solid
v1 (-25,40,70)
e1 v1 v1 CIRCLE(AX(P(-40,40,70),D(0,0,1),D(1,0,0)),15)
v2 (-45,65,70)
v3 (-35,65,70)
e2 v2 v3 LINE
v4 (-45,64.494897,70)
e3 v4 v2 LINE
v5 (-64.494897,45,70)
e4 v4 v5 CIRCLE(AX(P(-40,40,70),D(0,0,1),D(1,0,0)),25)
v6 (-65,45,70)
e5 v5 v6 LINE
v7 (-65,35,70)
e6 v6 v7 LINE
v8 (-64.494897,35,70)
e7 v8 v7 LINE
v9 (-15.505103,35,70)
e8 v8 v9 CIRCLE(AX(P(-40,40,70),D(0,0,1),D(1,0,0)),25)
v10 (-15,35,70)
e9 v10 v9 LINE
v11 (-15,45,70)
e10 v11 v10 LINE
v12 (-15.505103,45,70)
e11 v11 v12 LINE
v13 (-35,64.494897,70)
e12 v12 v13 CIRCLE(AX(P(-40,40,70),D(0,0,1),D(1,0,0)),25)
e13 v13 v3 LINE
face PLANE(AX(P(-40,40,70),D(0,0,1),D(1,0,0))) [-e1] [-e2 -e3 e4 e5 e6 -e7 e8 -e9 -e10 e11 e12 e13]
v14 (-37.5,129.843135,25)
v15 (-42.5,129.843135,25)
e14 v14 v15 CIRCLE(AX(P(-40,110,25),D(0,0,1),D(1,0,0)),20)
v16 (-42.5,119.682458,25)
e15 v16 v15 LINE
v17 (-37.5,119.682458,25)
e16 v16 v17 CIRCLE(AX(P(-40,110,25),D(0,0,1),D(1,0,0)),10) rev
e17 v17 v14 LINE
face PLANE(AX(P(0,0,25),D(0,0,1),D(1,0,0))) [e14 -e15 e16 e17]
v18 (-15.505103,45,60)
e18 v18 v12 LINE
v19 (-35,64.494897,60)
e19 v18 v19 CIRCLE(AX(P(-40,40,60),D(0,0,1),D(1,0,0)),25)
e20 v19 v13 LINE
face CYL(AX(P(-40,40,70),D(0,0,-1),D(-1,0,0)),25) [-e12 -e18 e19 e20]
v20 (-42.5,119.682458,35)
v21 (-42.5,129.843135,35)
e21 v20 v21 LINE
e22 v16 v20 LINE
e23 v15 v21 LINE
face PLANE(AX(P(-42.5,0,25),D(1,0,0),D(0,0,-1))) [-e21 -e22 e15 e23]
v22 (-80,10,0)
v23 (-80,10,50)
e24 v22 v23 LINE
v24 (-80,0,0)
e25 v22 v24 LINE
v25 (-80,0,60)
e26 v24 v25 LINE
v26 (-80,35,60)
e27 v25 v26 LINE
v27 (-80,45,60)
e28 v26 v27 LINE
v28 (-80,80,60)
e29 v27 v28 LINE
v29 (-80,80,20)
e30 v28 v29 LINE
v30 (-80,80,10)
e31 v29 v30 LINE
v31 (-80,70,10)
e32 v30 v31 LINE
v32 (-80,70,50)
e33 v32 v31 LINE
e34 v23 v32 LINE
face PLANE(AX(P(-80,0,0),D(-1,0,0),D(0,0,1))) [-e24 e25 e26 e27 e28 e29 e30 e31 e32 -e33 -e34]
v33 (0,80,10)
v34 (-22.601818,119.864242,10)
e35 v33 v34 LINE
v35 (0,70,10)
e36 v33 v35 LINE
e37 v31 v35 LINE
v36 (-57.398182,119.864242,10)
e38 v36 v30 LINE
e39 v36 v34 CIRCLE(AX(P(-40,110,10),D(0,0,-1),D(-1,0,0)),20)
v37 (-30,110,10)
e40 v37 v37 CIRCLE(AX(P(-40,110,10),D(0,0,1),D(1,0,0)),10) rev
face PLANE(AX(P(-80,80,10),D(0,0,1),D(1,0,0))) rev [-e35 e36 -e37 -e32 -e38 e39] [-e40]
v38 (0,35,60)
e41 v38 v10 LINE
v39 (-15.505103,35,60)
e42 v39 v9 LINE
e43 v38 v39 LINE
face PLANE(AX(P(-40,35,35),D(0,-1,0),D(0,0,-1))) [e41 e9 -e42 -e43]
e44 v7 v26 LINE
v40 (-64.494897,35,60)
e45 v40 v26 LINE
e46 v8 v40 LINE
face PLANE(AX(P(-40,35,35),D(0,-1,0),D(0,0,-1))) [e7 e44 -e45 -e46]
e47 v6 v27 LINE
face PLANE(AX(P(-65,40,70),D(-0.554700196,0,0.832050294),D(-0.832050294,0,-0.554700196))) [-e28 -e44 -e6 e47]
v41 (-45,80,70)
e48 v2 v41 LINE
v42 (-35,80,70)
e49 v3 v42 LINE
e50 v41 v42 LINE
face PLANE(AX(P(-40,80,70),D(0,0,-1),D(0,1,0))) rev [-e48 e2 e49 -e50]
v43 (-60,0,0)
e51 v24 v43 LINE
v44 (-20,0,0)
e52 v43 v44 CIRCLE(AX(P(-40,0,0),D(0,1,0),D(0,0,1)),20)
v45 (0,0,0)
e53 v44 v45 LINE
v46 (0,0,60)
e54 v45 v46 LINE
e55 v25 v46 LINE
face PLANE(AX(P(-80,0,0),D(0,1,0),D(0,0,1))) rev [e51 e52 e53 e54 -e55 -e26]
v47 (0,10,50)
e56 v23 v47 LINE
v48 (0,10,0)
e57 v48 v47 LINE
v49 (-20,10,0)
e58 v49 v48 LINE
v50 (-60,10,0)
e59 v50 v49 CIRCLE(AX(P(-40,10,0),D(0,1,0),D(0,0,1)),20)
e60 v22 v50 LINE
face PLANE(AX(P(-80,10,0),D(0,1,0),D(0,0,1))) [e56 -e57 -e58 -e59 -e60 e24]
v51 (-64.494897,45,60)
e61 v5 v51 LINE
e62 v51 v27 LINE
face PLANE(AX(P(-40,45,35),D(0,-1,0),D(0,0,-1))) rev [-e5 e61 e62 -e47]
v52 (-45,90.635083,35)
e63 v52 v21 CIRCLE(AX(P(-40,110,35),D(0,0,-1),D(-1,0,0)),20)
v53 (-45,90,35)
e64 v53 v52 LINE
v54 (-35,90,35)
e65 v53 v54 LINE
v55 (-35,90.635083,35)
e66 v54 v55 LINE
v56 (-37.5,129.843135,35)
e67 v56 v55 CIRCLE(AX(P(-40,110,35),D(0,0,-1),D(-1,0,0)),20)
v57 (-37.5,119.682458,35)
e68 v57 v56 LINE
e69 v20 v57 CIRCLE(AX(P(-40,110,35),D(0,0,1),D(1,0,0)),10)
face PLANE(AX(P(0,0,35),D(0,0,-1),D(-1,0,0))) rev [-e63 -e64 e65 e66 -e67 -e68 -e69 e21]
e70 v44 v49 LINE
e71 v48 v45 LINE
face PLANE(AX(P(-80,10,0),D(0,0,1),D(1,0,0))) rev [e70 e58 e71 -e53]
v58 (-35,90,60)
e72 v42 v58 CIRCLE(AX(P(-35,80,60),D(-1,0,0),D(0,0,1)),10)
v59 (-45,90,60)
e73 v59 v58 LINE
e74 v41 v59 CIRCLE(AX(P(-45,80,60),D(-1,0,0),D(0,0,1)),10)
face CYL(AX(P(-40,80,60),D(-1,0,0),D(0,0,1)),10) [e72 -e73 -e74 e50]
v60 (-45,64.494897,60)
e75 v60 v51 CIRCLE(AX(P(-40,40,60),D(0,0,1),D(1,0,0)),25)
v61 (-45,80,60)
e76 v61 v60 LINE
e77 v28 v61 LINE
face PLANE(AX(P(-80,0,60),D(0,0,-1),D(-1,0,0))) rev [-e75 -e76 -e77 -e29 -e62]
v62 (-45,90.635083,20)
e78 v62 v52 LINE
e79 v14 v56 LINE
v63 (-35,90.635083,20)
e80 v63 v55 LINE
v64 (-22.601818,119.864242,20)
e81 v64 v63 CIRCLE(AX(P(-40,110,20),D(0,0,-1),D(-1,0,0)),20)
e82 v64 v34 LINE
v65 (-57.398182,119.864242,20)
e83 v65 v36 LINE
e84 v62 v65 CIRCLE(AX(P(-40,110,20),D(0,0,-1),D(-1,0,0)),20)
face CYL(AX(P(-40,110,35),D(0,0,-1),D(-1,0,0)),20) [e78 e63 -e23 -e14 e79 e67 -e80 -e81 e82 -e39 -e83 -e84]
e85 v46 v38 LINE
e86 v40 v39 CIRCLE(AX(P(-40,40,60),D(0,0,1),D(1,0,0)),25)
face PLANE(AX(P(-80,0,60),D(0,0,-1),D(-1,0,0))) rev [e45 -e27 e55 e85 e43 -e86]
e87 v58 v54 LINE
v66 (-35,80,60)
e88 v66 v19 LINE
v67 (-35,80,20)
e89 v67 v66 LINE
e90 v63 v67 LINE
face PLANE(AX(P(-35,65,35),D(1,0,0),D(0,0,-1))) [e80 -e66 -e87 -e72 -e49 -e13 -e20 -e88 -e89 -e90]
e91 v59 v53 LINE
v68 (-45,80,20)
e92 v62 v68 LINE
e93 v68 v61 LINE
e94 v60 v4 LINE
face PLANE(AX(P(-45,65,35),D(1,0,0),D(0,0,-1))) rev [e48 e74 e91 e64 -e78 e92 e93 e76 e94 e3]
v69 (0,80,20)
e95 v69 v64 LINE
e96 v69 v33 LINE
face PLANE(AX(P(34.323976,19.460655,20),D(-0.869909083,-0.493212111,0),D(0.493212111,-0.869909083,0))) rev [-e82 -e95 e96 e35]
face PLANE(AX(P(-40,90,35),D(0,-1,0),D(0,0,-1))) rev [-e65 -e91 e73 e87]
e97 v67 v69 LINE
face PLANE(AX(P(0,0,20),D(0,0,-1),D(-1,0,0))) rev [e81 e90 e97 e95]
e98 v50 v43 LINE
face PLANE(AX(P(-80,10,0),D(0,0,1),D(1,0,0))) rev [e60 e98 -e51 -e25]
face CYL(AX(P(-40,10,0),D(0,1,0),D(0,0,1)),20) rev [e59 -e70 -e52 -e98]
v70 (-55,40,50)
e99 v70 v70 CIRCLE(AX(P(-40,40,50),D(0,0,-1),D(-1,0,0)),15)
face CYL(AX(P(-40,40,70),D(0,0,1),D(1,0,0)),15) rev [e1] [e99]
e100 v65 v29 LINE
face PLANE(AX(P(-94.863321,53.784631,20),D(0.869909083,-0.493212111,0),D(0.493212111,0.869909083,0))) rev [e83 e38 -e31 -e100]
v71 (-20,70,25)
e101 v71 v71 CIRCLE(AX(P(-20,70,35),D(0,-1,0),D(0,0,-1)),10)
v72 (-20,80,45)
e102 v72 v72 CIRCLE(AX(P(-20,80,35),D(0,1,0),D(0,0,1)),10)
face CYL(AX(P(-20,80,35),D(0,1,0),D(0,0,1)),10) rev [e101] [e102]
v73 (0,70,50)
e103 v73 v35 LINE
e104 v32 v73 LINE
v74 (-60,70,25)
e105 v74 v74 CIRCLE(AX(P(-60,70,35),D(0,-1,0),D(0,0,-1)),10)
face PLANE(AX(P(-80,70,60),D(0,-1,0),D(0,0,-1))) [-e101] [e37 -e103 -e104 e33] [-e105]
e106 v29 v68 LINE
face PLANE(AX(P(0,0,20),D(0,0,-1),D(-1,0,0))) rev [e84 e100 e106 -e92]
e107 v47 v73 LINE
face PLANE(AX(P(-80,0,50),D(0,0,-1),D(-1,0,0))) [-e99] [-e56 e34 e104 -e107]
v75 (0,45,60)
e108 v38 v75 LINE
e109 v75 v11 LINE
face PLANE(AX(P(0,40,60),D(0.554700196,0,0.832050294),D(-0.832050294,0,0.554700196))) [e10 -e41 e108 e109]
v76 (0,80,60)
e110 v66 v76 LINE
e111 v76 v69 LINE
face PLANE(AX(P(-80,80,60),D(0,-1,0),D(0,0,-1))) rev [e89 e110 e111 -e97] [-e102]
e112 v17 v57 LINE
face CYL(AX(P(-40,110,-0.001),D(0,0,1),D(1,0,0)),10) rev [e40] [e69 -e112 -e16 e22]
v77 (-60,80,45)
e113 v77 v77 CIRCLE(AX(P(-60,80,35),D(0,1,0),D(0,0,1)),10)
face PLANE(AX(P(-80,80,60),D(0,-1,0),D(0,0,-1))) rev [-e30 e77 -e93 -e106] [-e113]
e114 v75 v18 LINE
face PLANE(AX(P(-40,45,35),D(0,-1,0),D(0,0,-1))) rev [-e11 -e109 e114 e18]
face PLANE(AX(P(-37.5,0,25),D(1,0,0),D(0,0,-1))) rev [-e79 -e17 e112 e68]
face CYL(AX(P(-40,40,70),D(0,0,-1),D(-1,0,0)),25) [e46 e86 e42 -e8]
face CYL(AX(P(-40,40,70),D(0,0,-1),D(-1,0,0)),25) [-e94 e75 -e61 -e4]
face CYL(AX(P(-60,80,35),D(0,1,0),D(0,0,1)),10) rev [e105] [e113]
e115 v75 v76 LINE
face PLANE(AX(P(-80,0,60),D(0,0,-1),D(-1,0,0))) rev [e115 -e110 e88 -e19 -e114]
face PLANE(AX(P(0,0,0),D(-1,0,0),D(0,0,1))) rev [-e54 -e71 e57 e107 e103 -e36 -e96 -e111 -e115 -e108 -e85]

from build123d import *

# Parameters (mm, degrees)
EXTRUDE_THIN1_DEPTH = 80
BOSS_EXTRUDE1_DEPTH = 10
SKETCH2_3_R         = 20
BOSS_EXTRUDE2_DEPTH = 25
CUT_EXTRUDE1_REACH  = 158.605
SKETCH3_3_R         = 10
SKETCH3_3_W         = 5
SKETCH3_3_H         = 10.317541634
CUT_EXTRUDE2_DEPTH  = 10
HOLE1_D             = 40
HOLE1_DEPTH         = 10
SKETCH6_R           = 25
BOSS_EXTRUDE3_DEPTH = 10
RIB17_START         = -5
RIB17_DEPTH         = 10
RIB18_START         = -5
RIB18_DEPTH         = 10
RIB26_START         = -5
RIB26_DEPTH         = 10
HOLE2_D             = 30
HOLE3_D             = 20
HOLE3_DEPTH         = 10


with BuildPart() as part:
    # Sketch1 → Extrude-Thin1 (new body)
    with BuildSketch(Plane(origin=(0, 0, 0), x_dir=(0, 0, -1), z_dir=(1, 0, 0))):
        Polygon((0, 0), (-60, 0), (-60, 80), (-10, 80), (-10, 70), (-50, 70), (-50, 10), (0, 10), align=None)
    extrude(amount=-EXTRUDE_THIN1_DEPTH)

    # Sketch2 → Boss-Extrude1 (add)
    with BuildSketch(Plane(origin=(0, 0, 10), x_dir=(-1, 0, 0), z_dir=(0, 0, -1))):
        with BuildLine():
            Line((40, 80), (80, 80))
            Line((80, 80), (57.398181668, 119.864242224))
            ThreePointArc((57.398181668, 119.864242224), (59.338609482, 115.100802223), (60, 110))
            ThreePointArc((60, 110), (54.142135624, 95.857864376), (40, 90))
            Line((40, 90), (40, 80))
        make_face()
        with BuildLine():
            Line((0, 80), (40, 80))
            Line((40, 80), (40, 90))
            ThreePointArc((40, 90), (22.718726255, 99.932349938), (22.601818332, 119.864242224))
            Line((22.601818332, 119.864242224), (0, 80))
        make_face()
    extrude(amount=-BOSS_EXTRUDE1_DEPTH)

    # Sketch2<3> → Boss-Extrude2 (add)
    with BuildSketch(Plane(origin=(0, 0, 10), x_dir=(-1, 0, 0), z_dir=(0, 0, -1))):
        with Locations((40, 110)):
            Circle(SKETCH2_3_R)
    extrude(amount=-BOSS_EXTRUDE2_DEPTH)

    # Sketch3 → Cut-Extrude1 (cut, up to next)
    with BuildSketch(Plane.XY.offset(35), mode=Mode.PRIVATE) as cut_extrude1_sk1:
        with BuildLine():
            ThreePointArc((-37.5, 119.682458366), (-40, 120), (-42.5, 119.682458366))
            Line((-42.5, 119.682458366), (-37.5, 119.682458366))
        make_face()
    cut_extrude1_tool1 = extrude(cut_extrude1_sk1.sketch, amount=-CUT_EXTRUDE1_REACH, mode=Mode.PRIVATE) & part.part
    # Sketch3 → Cut-Extrude1 (cut, up to next)
    with BuildSketch(Plane.XY.offset(35), mode=Mode.PRIVATE) as cut_extrude1_sk2:
        with BuildLine():
            Line((-37.5, 119.682458366), (-42.5, 119.682458366))
            ThreePointArc((-42.5, 119.682458366), (-46.123724357, 102.09430585), (-30, 110))
            ThreePointArc((-30, 110), (-32.09430585, 116.123724357), (-37.5, 119.682458366))
        make_face()
    cut_extrude1_tool2 = extrude(cut_extrude1_sk2.sketch, amount=-CUT_EXTRUDE1_REACH, mode=Mode.PRIVATE) & part.part
    add(cut_extrude1_tool1.solids().sort_by_distance((-40, 119.809649, 35))[0], mode=Mode.SUBTRACT)
    add(cut_extrude1_tool2.solids().sort_by_distance((-40, 109.96673, 35))[0], mode=Mode.SUBTRACT)

    # Sketch3<3> → Cut-Extrude2 (cut)
    with BuildSketch(Plane.XY.offset(35)):
        with Locations((-40, 110)):
            Circle(SKETCH3_3_R)
        with Locations((-40, 124.841229183)):
            Rectangle(SKETCH3_3_W, SKETCH3_3_H)
    extrude(amount=-CUT_EXTRUDE2_DEPTH, mode=Mode.SUBTRACT)

    # Hole1
    with Locations(Plane(origin=(0, 10, 0), x_dir=(1, 0, 0), z_dir=(0, 1, 0))):
        with Locations((-40, 0)):
            Hole(HOLE1_D / 2, depth=HOLE1_DEPTH)

    # Sketch6 → Boss-Extrude3 (add)
    with BuildSketch(Plane.XY.offset(60)):
        with Locations((-40, 40)):
            Circle(SKETCH6_R)
    extrude(amount=BOSS_EXTRUDE3_DEPTH)

    # Rib17: read off the stored shape, not the designer's step
    # Rib17 outline → Rib17 (add)
    with BuildSketch(Plane(origin=(0, 40, 0), x_dir=(-1, 0, 0), z_dir=(0, -1, 0)).offset(RIB17_START)):
        Polygon((15.505102572, -70), (15.505102572, -60), (0, -60), (15, -70), align=None)
    extrude(amount=RIB17_DEPTH)

    # Rib18: read off the stored shape, not the designer's step
    # Rib18 outline → Rib18 (add)
    with BuildSketch(Plane(origin=(0, 40, 0), x_dir=(-1, 0, 0), z_dir=(0, -1, 0)).offset(RIB18_START)):
        Polygon((80, -60), (64.494897428, -60), (64.494897428, -70), (65, -70), align=None)
    extrude(amount=RIB18_DEPTH)

    # Rib26: read off the stored shape, not the designer's step
    # Rib26 outline → Rib26 (add)
    with BuildSketch(Plane(origin=(-40, 0, 0), x_dir=(0, 0, -1), z_dir=(1, 0, 0)).offset(RIB26_START)):
        with BuildLine():
            Line((-70, 80), (-70, 64.494897428))
            Line((-70, 64.494897428), (-60, 64.494897428))
            Line((-60, 64.494897428), (-60, 80))
            Line((-60, 80), (-20, 80))
            Line((-20, 80), (-20, 90.635083269))
            Line((-20, 90.635083269), (-35, 90.635083269))
            Line((-35, 90.635083269), (-35, 90))
            Line((-35, 90), (-60, 90))
            ThreePointArc((-60, 90), (-67.071067812, 87.071067812), (-70, 80))
        make_face()
    extrude(amount=RIB26_DEPTH)

    # Hole2 (through all)
    with Locations(Plane.XY.offset(70)):
        with Locations((-40, 40)):
            Hole(HOLE2_D / 2)

    # Hole3
    with Locations(Plane(origin=(0, 80, 0), x_dir=(1, 0, 0), z_dir=(0, 1, 0))):
        with Locations((-20, -35)):
            hole3 = Hole(HOLE3_D / 2, depth=HOLE3_DEPTH)

    # Mirror1: Hole3 across plane
    add(hole3.mirror(Plane(origin=(-40, 0, 0), x_dir=(0, 0, 1), z_dir=(1, 0, 0))), mode=Mode.SUBTRACT)


solid = part.part
